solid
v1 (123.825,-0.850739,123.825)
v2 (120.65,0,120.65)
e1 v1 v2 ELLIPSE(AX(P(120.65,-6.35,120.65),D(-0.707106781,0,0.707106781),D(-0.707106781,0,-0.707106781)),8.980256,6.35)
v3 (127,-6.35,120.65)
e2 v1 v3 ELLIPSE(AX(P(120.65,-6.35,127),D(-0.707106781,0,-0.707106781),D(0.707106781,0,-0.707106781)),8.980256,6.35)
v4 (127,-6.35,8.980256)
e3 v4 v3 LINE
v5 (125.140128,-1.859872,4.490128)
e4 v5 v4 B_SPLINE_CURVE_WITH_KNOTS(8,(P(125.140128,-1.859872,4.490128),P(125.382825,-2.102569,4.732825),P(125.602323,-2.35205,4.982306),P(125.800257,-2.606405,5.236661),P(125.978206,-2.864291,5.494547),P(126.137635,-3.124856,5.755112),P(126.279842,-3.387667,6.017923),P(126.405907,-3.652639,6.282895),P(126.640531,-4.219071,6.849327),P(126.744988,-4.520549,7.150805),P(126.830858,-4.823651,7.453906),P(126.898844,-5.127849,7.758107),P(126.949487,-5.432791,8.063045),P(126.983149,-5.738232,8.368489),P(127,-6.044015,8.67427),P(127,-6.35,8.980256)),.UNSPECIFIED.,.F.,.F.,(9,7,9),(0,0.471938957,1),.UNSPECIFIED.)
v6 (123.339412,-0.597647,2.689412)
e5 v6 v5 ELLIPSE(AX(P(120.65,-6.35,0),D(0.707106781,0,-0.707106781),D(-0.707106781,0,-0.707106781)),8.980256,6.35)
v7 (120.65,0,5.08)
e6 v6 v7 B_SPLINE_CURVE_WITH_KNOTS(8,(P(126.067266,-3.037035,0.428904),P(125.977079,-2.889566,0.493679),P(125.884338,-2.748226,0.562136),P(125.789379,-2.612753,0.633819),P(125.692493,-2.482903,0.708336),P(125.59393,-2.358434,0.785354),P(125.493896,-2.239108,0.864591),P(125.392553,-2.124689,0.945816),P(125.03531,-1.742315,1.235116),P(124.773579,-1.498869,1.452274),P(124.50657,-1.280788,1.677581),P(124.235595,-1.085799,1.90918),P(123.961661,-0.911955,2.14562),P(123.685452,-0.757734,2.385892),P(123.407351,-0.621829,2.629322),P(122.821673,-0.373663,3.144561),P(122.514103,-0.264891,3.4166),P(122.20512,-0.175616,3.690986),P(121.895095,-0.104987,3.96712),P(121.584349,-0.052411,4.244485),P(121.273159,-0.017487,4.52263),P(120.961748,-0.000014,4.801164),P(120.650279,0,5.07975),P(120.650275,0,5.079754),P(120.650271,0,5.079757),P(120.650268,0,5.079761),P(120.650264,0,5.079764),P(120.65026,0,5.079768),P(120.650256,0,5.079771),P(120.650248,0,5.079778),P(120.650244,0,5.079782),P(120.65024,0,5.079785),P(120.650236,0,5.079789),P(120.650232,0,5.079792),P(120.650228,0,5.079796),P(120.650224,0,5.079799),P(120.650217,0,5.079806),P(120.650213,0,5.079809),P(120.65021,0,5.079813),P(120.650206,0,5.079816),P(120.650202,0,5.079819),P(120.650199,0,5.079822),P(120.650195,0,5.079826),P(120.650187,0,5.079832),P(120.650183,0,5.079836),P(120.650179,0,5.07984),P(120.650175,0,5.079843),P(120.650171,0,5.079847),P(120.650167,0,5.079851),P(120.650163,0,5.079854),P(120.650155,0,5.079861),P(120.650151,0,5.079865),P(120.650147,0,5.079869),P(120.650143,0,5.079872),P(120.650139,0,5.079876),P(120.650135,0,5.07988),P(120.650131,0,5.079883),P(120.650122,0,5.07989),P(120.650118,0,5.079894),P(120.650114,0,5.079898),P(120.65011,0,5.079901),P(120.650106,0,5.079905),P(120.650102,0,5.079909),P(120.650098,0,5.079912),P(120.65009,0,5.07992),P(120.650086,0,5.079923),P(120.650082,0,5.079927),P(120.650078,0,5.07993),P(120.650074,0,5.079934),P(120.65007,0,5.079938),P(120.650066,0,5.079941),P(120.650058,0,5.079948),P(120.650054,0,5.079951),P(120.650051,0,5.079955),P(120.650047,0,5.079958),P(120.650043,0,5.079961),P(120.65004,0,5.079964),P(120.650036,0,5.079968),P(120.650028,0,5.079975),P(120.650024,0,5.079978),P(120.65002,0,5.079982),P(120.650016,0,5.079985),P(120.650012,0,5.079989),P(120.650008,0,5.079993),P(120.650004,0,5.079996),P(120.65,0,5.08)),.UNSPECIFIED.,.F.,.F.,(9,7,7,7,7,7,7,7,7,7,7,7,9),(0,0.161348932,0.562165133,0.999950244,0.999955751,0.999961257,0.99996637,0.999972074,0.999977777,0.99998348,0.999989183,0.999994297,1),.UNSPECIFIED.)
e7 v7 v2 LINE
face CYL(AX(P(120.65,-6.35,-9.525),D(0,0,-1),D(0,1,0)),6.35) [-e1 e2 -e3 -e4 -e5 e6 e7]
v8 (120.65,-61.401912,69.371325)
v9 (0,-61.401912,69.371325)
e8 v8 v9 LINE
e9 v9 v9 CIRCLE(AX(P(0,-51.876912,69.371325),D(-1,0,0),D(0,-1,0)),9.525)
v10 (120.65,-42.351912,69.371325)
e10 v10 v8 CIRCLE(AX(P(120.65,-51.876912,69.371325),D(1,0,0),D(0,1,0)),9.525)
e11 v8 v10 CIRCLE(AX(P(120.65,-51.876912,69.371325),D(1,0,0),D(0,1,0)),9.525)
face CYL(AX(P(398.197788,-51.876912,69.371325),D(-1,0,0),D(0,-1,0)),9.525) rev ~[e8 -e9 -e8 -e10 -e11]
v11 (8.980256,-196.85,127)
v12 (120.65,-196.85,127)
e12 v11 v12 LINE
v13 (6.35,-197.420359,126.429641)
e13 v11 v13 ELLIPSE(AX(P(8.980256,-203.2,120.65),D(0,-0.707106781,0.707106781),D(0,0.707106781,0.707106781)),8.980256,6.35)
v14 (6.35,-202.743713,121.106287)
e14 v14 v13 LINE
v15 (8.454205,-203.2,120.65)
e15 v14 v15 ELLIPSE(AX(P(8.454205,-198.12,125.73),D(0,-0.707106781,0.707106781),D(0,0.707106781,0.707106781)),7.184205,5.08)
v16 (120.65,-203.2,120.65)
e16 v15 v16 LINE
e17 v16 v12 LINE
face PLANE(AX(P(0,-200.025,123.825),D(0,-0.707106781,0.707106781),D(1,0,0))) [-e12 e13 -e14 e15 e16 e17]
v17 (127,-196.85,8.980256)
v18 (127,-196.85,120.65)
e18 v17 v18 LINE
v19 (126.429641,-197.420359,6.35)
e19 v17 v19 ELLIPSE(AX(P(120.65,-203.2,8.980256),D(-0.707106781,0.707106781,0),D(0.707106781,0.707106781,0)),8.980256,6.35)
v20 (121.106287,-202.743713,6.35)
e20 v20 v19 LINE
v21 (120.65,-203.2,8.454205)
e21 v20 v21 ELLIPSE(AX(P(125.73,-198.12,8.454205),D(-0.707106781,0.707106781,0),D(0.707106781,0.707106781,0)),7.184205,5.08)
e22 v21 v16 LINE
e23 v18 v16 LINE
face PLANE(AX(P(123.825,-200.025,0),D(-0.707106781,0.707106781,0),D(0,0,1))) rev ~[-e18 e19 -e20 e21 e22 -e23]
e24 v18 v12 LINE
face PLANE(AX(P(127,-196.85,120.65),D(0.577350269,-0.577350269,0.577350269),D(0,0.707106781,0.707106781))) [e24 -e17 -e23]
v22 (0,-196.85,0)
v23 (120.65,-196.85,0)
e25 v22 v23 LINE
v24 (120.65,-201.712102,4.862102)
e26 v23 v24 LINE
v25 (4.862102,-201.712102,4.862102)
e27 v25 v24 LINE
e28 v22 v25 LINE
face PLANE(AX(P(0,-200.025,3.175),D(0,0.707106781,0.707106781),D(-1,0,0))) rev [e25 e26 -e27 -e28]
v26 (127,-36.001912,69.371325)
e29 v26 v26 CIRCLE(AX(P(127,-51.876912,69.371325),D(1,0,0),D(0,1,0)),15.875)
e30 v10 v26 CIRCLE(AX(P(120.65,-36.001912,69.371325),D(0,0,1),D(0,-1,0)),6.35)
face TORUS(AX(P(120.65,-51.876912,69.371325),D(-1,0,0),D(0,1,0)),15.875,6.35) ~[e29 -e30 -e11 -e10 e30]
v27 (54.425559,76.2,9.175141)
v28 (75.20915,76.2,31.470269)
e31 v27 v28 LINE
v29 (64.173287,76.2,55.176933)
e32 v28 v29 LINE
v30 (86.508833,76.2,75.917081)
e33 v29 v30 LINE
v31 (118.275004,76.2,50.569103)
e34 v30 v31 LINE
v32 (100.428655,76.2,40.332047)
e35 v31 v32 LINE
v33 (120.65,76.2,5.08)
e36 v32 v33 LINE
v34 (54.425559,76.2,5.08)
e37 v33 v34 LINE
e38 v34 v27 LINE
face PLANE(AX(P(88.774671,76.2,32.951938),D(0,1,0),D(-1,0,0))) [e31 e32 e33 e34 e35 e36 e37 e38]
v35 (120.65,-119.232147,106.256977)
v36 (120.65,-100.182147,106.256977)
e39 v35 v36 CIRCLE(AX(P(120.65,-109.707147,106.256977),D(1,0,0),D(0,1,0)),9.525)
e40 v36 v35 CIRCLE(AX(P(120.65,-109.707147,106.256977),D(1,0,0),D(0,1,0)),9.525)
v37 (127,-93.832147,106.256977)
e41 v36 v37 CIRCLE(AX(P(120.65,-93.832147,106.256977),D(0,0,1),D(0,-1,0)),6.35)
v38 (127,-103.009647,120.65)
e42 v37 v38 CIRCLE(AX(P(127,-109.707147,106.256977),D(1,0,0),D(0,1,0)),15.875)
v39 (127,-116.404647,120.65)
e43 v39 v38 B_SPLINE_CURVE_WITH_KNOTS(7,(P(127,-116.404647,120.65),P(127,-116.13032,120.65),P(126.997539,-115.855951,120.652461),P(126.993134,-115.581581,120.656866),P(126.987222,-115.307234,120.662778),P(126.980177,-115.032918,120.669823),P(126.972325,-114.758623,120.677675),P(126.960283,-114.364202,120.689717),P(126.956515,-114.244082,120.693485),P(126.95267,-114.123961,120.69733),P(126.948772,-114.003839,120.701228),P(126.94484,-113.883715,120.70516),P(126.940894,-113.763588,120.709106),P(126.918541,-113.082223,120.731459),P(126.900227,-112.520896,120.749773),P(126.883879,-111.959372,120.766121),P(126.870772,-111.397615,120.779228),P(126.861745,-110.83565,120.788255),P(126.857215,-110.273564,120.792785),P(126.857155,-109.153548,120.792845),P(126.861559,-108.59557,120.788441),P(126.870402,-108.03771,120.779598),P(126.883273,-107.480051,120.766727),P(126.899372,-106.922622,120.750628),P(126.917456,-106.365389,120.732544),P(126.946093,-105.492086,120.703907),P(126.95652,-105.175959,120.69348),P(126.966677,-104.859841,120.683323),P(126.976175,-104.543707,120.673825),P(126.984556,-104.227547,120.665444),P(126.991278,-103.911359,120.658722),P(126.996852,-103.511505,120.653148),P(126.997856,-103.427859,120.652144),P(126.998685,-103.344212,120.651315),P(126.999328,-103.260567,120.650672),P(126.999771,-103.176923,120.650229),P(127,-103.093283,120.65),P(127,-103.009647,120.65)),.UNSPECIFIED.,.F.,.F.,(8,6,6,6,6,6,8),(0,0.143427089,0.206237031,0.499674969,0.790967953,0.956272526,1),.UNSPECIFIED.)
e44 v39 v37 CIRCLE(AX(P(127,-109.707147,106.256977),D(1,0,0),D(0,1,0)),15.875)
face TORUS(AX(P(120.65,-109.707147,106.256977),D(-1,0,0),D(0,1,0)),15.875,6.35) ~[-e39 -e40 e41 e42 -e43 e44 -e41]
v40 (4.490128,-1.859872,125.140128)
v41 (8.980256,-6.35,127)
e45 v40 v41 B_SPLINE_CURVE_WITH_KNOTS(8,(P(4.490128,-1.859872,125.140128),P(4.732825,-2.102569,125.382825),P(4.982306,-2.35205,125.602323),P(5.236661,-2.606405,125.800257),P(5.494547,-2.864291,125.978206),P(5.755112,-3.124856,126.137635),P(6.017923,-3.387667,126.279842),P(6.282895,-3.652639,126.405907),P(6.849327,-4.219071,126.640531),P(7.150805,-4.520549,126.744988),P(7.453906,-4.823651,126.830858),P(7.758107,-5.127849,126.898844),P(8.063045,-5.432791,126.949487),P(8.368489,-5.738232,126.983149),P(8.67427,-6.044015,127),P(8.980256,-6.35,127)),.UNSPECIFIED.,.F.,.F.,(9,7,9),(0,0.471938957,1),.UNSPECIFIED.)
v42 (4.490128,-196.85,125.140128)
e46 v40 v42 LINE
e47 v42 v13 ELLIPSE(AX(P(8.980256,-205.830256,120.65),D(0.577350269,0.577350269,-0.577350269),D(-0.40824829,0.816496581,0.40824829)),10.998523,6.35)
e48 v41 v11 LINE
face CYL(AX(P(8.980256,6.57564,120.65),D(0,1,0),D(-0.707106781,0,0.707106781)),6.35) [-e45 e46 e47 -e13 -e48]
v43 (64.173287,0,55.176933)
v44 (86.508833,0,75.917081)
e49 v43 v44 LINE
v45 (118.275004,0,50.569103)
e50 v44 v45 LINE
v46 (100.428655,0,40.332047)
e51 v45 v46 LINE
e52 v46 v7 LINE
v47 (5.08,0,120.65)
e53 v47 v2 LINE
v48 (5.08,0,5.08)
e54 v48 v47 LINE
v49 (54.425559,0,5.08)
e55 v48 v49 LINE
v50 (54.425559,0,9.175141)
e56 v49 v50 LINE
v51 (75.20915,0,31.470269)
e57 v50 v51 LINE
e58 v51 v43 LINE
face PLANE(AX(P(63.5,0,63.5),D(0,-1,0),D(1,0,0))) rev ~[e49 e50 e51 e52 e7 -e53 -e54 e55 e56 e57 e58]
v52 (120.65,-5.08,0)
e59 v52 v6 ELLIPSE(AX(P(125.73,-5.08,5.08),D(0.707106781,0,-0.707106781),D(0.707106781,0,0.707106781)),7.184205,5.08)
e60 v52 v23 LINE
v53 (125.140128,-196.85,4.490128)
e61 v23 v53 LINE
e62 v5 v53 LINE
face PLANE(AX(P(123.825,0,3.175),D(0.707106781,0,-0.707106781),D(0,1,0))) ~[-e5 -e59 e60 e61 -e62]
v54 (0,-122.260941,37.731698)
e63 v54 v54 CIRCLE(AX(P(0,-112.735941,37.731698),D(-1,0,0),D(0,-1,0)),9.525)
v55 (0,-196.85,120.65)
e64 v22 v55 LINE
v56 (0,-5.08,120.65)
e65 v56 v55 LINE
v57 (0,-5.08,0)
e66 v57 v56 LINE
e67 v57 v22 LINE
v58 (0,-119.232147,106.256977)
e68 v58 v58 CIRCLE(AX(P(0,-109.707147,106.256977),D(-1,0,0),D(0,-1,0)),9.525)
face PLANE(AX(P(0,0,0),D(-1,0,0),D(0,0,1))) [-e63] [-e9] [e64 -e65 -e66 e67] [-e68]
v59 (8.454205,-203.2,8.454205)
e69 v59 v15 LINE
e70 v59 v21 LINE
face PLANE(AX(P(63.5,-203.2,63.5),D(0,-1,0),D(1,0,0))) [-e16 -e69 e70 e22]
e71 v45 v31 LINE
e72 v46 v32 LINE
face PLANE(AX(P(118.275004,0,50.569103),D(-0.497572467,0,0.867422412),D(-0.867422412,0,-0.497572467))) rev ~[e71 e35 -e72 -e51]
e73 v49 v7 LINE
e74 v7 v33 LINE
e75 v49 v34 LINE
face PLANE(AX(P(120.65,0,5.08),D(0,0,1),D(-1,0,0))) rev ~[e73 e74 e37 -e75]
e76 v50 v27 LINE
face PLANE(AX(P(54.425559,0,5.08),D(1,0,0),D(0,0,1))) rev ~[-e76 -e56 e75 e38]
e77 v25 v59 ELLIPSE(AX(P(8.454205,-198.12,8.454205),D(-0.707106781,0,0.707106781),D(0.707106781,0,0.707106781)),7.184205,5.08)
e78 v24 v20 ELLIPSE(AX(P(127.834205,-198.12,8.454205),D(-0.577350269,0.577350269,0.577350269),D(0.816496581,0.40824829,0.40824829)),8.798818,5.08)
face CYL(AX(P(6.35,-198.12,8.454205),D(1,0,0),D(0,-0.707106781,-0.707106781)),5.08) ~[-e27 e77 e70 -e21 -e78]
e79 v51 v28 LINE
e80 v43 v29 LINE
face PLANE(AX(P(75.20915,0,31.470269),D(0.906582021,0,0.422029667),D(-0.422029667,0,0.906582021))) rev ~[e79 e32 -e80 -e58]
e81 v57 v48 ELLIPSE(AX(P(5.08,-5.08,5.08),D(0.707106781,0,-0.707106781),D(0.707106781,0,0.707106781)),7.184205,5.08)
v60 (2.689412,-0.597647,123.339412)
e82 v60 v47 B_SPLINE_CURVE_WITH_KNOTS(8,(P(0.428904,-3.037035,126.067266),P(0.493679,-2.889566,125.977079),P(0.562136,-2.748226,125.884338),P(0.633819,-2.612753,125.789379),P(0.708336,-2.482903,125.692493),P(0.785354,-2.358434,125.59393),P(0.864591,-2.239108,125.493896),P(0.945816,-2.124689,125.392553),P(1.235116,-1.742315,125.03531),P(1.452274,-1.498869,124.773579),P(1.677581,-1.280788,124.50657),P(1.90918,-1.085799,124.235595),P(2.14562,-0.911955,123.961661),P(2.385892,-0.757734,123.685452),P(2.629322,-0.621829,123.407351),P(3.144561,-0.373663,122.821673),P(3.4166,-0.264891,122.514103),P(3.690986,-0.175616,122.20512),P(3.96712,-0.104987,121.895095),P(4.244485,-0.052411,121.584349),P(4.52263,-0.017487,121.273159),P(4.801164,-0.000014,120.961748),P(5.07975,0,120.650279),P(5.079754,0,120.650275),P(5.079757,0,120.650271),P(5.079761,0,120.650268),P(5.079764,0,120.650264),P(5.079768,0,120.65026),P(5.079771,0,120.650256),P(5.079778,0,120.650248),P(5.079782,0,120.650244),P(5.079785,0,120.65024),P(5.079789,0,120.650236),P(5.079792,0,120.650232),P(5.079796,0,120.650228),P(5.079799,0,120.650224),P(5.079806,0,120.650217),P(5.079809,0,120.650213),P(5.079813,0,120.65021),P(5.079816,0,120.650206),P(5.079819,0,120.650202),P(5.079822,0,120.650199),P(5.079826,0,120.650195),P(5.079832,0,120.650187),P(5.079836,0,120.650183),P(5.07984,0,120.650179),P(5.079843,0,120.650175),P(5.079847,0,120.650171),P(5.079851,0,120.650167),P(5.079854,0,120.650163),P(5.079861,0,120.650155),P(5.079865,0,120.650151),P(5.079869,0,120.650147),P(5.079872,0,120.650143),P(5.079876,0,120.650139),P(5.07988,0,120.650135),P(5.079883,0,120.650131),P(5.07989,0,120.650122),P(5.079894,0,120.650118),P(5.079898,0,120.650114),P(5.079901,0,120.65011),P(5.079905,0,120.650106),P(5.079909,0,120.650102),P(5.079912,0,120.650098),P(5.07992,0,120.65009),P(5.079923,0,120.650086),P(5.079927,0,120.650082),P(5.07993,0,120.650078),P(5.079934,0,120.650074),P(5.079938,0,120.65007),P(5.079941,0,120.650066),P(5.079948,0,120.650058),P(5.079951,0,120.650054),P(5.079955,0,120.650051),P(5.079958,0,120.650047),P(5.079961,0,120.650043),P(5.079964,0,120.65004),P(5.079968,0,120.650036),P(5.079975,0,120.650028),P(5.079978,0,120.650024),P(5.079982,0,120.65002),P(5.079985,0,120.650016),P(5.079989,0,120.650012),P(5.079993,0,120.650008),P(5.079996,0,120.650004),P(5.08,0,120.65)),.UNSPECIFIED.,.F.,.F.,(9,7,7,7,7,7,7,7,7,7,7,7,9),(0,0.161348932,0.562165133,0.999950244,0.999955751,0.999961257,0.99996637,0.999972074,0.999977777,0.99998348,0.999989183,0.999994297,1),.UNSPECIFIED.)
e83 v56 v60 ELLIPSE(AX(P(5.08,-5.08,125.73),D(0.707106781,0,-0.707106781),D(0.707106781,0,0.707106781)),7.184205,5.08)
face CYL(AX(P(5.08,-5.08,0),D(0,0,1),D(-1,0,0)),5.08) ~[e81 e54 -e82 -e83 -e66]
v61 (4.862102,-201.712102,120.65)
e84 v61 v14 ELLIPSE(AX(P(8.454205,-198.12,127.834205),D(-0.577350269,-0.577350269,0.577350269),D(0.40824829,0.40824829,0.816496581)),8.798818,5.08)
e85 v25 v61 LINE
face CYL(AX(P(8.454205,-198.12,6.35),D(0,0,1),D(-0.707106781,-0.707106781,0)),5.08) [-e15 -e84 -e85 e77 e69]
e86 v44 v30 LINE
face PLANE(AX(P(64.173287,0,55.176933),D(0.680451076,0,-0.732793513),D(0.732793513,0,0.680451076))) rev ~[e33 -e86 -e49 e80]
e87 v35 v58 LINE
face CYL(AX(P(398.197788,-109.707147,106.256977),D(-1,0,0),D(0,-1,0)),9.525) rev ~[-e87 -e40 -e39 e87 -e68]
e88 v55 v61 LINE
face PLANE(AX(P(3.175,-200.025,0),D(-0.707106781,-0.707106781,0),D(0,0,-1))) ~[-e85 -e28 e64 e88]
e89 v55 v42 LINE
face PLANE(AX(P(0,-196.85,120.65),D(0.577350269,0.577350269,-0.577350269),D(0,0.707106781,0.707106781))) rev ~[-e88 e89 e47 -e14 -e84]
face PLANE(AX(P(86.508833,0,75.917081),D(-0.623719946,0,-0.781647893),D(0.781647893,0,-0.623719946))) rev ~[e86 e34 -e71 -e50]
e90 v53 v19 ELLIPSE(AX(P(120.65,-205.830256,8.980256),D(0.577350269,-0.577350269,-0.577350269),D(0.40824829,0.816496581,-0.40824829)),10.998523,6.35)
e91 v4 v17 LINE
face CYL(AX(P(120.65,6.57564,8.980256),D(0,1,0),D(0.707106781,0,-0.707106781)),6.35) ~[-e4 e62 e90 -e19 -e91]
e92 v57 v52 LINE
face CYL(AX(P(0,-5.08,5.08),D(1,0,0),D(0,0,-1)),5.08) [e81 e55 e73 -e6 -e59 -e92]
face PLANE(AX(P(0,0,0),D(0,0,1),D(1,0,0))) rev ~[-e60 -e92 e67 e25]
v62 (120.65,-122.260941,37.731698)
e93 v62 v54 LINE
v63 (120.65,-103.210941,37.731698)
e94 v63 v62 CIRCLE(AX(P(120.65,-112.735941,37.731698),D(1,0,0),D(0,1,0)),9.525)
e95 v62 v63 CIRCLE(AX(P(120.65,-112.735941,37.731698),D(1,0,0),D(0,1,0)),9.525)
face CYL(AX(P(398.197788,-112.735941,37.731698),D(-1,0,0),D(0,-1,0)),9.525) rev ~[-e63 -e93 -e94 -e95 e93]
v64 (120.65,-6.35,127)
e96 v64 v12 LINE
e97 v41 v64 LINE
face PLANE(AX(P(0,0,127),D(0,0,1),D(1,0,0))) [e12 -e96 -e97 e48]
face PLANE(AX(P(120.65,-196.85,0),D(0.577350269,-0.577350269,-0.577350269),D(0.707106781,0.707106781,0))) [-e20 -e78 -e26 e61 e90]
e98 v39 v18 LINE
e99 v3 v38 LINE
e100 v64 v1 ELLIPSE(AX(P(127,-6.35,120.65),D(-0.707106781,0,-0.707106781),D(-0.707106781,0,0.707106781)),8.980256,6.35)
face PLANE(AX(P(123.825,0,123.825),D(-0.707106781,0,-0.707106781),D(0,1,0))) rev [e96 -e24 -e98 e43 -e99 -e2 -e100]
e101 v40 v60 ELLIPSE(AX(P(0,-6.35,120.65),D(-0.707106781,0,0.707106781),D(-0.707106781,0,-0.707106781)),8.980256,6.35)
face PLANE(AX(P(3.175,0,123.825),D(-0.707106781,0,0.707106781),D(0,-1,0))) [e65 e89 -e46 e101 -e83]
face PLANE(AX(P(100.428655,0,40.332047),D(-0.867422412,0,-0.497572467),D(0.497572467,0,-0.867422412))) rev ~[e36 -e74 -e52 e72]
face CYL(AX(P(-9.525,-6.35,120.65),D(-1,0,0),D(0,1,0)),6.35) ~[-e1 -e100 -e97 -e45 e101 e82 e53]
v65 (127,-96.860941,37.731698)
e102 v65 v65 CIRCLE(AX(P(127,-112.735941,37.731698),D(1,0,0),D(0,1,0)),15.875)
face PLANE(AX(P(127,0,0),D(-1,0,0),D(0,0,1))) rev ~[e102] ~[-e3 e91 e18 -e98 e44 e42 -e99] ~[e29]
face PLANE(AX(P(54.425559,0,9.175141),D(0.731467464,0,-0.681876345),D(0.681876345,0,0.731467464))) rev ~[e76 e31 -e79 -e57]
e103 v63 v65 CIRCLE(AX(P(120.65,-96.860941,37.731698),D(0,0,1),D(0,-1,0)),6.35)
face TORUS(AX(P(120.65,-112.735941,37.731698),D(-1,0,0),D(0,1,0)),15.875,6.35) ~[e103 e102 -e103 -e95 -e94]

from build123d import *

# Parameters (mm, degrees)
F0_W        = 127
F0_H        = 127
F1_DEPTH    = 203.2
F3_D        = 19.05
F4_SIZE     = 6.35
F5_T1_DEPTH = 210.0012806053
F5_T3_DEPTH = 146.05
F5_T5_DEPTH = 146.05
F6_R        = 5.08
F7_R        = 5.08
F9_DEPTH    = 76.2


# Not quite as in the source:
# - a fillet or chamfer that OpenCascade refuses, or shapes differently, is made with other operations: its cross-section is extruded or revolved along the edge and cut away or added


with BuildPart() as f1:
    # F0 (on Front) → F1 (new body)
    with BuildSketch(Plane.XZ):
        with Locations((63.5, 63.5)):
            Rectangle(F0_W, F0_H)
    extrude(amount=F1_DEPTH)

    # F3 (through all)
    with Locations(Plane.YZ.offset(127)):
        with Locations((-109.707146883, 106.2569767237), (-51.8769121036, 69.3713248935), (-112.7359410134, 37.7316983828)):
            Hole(F3_D / 2)

    # F4
    f4_edges = [f1.edges().sort_by_distance(p)[0] for p in [
        (63.5, -203.2, 127),
        (0, -203.2, 63.5),
        (127, -203.2, 63.5),
        (63.5, -203.2, 0),
        (127, -101.6, 0),
        (127, -101.6, 127),
        (0, -101.6, 127),
    ]]
    chamfer(f4_edges, length=F4_SIZE)

    # F5: fillet of radius 6.35 on 7 edges, made by hand

    # F5_s2 → F5_t1 (cut)
    with BuildSketch(Plane.XZ.offset(-6.5756403027)):
        with BuildLine():
            ThreePointArc((4.4901280605, 125.1401280605), (6.5502163256, 126.5166350314), (8.9802561211, 127))
            Line((8.9802561211, 127), (6.35, 127))
            Line((6.35, 127), (4.4901280605, 125.1401280605))
        make_face()
        with BuildLine():
            ThreePointArc((125.1401280605, 4.4901280605), (126.5166350314, 6.5502163256), (127, 8.9802561211))
            Line((127, 8.9802561211), (127, 6.35))
            Line((127, 6.35), (125.1401280605, 4.4901280605))
        make_face()
    extrude(amount=F5_T1_DEPTH, mode=Mode.SUBTRACT)

    # F5_s4 → F5_t3 (cut)
    with BuildSketch(Plane.YZ.offset(-9.525)):
        with BuildLine():
            ThreePointArc((0, 120.65), (-1.8598719395, 125.1401280605), (-6.35, 127))
            Line((-6.35, 127), (0, 127))
            Line((0, 127), (0, 120.65))
        make_face()
    extrude(amount=F5_T3_DEPTH, mode=Mode.SUBTRACT)

    # F5_s6 → F5_t5 (cut)
    with BuildSketch(Plane.XY.offset(-9.525)):
        with BuildLine():
            ThreePointArc((120.65, 0), (125.1401280605, -1.8598719395), (127, -6.35))
            Line((127, -6.35), (127, 0))
            Line((127, 0), (120.65, 0))
        make_face()
    extrude(amount=F5_T5_DEPTH, mode=Mode.SUBTRACT)

    # F5_s7 → F5_t8 (revolve, cut)
    with BuildSketch(Plane.XY.offset(106.2569767237)):
        with BuildLine():
            ThreePointArc((120.65, -100.182146883), (125.1401280605, -98.3222749435), (127, -93.832146883))
            Line((127, -93.832146883), (127, -100.182146883))
            Line((127, -100.182146883), (120.65, -100.182146883))
        make_face()
    revolve(axis=Axis((127, -109.707146883, 106.2569767237), (1, 0, 0)), mode=Mode.SUBTRACT)

    # F5_s9 → F5_t10 (revolve, cut)
    with BuildSketch(Plane.XY.offset(37.7316983828)):
        with BuildLine():
            ThreePointArc((120.65, -103.2109410134), (125.1401280605, -101.3510690739), (127, -96.8609410134))
            Line((127, -96.8609410134), (127, -103.2109410134))
            Line((127, -103.2109410134), (120.65, -103.2109410134))
        make_face()
    revolve(axis=Axis((127, -112.7359410134, 37.7316983828), (1, 0, 0)), mode=Mode.SUBTRACT)

    # F5_s11 → F5_t12 (revolve, cut)
    with BuildSketch(Plane.XY.offset(69.3713248935)):
        with BuildLine():
            ThreePointArc((120.65, -42.3519121036), (125.1401280605, -40.4920401641), (127, -36.0019121036))
            Line((127, -36.0019121036), (127, -42.3519121036))
            Line((127, -42.3519121036), (120.65, -42.3519121036))
        make_face()
    revolve(axis=Axis((127, -51.8769121036, 69.3713248935), (1, 0, 0)), mode=Mode.SUBTRACT)

    # F6
    f6_edges = [f1.edges().sort_by_distance(p)[0] for p in [
        (6.35, -203.2, 63.5),
        (63.5, -203.2, 6.35),
    ]]
    fillet(f6_edges, radius=F6_R)

    # F7
    f7_edges = [f1.edges().sort_by_distance(p)[0] for p in [
        (60.325, 0, 0),
        (0, 0, 60.325),
    ]]
    fillet(f7_edges, radius=F7_R)

    # F8 (on face) → F9 (join)
    with BuildSketch(Plane(origin=(0, 0, 0), x_dir=(-1, 0, 0), z_dir=(0, 1, 0))):
        Polygon((-100.4286549397, 40.3320468052), (-120.65, 5.08), (-54.4255593013, 5.08), (-54.4255593013, 9.1751408411), (-75.2091502909, 31.4702691336), (-64.1732869808, 55.1769325335), (-86.5088332529, 75.9170813451), (-118.2750036349, 50.5691027419), align=None)
    extrude(amount=F9_DEPTH)


solid = f1.part
